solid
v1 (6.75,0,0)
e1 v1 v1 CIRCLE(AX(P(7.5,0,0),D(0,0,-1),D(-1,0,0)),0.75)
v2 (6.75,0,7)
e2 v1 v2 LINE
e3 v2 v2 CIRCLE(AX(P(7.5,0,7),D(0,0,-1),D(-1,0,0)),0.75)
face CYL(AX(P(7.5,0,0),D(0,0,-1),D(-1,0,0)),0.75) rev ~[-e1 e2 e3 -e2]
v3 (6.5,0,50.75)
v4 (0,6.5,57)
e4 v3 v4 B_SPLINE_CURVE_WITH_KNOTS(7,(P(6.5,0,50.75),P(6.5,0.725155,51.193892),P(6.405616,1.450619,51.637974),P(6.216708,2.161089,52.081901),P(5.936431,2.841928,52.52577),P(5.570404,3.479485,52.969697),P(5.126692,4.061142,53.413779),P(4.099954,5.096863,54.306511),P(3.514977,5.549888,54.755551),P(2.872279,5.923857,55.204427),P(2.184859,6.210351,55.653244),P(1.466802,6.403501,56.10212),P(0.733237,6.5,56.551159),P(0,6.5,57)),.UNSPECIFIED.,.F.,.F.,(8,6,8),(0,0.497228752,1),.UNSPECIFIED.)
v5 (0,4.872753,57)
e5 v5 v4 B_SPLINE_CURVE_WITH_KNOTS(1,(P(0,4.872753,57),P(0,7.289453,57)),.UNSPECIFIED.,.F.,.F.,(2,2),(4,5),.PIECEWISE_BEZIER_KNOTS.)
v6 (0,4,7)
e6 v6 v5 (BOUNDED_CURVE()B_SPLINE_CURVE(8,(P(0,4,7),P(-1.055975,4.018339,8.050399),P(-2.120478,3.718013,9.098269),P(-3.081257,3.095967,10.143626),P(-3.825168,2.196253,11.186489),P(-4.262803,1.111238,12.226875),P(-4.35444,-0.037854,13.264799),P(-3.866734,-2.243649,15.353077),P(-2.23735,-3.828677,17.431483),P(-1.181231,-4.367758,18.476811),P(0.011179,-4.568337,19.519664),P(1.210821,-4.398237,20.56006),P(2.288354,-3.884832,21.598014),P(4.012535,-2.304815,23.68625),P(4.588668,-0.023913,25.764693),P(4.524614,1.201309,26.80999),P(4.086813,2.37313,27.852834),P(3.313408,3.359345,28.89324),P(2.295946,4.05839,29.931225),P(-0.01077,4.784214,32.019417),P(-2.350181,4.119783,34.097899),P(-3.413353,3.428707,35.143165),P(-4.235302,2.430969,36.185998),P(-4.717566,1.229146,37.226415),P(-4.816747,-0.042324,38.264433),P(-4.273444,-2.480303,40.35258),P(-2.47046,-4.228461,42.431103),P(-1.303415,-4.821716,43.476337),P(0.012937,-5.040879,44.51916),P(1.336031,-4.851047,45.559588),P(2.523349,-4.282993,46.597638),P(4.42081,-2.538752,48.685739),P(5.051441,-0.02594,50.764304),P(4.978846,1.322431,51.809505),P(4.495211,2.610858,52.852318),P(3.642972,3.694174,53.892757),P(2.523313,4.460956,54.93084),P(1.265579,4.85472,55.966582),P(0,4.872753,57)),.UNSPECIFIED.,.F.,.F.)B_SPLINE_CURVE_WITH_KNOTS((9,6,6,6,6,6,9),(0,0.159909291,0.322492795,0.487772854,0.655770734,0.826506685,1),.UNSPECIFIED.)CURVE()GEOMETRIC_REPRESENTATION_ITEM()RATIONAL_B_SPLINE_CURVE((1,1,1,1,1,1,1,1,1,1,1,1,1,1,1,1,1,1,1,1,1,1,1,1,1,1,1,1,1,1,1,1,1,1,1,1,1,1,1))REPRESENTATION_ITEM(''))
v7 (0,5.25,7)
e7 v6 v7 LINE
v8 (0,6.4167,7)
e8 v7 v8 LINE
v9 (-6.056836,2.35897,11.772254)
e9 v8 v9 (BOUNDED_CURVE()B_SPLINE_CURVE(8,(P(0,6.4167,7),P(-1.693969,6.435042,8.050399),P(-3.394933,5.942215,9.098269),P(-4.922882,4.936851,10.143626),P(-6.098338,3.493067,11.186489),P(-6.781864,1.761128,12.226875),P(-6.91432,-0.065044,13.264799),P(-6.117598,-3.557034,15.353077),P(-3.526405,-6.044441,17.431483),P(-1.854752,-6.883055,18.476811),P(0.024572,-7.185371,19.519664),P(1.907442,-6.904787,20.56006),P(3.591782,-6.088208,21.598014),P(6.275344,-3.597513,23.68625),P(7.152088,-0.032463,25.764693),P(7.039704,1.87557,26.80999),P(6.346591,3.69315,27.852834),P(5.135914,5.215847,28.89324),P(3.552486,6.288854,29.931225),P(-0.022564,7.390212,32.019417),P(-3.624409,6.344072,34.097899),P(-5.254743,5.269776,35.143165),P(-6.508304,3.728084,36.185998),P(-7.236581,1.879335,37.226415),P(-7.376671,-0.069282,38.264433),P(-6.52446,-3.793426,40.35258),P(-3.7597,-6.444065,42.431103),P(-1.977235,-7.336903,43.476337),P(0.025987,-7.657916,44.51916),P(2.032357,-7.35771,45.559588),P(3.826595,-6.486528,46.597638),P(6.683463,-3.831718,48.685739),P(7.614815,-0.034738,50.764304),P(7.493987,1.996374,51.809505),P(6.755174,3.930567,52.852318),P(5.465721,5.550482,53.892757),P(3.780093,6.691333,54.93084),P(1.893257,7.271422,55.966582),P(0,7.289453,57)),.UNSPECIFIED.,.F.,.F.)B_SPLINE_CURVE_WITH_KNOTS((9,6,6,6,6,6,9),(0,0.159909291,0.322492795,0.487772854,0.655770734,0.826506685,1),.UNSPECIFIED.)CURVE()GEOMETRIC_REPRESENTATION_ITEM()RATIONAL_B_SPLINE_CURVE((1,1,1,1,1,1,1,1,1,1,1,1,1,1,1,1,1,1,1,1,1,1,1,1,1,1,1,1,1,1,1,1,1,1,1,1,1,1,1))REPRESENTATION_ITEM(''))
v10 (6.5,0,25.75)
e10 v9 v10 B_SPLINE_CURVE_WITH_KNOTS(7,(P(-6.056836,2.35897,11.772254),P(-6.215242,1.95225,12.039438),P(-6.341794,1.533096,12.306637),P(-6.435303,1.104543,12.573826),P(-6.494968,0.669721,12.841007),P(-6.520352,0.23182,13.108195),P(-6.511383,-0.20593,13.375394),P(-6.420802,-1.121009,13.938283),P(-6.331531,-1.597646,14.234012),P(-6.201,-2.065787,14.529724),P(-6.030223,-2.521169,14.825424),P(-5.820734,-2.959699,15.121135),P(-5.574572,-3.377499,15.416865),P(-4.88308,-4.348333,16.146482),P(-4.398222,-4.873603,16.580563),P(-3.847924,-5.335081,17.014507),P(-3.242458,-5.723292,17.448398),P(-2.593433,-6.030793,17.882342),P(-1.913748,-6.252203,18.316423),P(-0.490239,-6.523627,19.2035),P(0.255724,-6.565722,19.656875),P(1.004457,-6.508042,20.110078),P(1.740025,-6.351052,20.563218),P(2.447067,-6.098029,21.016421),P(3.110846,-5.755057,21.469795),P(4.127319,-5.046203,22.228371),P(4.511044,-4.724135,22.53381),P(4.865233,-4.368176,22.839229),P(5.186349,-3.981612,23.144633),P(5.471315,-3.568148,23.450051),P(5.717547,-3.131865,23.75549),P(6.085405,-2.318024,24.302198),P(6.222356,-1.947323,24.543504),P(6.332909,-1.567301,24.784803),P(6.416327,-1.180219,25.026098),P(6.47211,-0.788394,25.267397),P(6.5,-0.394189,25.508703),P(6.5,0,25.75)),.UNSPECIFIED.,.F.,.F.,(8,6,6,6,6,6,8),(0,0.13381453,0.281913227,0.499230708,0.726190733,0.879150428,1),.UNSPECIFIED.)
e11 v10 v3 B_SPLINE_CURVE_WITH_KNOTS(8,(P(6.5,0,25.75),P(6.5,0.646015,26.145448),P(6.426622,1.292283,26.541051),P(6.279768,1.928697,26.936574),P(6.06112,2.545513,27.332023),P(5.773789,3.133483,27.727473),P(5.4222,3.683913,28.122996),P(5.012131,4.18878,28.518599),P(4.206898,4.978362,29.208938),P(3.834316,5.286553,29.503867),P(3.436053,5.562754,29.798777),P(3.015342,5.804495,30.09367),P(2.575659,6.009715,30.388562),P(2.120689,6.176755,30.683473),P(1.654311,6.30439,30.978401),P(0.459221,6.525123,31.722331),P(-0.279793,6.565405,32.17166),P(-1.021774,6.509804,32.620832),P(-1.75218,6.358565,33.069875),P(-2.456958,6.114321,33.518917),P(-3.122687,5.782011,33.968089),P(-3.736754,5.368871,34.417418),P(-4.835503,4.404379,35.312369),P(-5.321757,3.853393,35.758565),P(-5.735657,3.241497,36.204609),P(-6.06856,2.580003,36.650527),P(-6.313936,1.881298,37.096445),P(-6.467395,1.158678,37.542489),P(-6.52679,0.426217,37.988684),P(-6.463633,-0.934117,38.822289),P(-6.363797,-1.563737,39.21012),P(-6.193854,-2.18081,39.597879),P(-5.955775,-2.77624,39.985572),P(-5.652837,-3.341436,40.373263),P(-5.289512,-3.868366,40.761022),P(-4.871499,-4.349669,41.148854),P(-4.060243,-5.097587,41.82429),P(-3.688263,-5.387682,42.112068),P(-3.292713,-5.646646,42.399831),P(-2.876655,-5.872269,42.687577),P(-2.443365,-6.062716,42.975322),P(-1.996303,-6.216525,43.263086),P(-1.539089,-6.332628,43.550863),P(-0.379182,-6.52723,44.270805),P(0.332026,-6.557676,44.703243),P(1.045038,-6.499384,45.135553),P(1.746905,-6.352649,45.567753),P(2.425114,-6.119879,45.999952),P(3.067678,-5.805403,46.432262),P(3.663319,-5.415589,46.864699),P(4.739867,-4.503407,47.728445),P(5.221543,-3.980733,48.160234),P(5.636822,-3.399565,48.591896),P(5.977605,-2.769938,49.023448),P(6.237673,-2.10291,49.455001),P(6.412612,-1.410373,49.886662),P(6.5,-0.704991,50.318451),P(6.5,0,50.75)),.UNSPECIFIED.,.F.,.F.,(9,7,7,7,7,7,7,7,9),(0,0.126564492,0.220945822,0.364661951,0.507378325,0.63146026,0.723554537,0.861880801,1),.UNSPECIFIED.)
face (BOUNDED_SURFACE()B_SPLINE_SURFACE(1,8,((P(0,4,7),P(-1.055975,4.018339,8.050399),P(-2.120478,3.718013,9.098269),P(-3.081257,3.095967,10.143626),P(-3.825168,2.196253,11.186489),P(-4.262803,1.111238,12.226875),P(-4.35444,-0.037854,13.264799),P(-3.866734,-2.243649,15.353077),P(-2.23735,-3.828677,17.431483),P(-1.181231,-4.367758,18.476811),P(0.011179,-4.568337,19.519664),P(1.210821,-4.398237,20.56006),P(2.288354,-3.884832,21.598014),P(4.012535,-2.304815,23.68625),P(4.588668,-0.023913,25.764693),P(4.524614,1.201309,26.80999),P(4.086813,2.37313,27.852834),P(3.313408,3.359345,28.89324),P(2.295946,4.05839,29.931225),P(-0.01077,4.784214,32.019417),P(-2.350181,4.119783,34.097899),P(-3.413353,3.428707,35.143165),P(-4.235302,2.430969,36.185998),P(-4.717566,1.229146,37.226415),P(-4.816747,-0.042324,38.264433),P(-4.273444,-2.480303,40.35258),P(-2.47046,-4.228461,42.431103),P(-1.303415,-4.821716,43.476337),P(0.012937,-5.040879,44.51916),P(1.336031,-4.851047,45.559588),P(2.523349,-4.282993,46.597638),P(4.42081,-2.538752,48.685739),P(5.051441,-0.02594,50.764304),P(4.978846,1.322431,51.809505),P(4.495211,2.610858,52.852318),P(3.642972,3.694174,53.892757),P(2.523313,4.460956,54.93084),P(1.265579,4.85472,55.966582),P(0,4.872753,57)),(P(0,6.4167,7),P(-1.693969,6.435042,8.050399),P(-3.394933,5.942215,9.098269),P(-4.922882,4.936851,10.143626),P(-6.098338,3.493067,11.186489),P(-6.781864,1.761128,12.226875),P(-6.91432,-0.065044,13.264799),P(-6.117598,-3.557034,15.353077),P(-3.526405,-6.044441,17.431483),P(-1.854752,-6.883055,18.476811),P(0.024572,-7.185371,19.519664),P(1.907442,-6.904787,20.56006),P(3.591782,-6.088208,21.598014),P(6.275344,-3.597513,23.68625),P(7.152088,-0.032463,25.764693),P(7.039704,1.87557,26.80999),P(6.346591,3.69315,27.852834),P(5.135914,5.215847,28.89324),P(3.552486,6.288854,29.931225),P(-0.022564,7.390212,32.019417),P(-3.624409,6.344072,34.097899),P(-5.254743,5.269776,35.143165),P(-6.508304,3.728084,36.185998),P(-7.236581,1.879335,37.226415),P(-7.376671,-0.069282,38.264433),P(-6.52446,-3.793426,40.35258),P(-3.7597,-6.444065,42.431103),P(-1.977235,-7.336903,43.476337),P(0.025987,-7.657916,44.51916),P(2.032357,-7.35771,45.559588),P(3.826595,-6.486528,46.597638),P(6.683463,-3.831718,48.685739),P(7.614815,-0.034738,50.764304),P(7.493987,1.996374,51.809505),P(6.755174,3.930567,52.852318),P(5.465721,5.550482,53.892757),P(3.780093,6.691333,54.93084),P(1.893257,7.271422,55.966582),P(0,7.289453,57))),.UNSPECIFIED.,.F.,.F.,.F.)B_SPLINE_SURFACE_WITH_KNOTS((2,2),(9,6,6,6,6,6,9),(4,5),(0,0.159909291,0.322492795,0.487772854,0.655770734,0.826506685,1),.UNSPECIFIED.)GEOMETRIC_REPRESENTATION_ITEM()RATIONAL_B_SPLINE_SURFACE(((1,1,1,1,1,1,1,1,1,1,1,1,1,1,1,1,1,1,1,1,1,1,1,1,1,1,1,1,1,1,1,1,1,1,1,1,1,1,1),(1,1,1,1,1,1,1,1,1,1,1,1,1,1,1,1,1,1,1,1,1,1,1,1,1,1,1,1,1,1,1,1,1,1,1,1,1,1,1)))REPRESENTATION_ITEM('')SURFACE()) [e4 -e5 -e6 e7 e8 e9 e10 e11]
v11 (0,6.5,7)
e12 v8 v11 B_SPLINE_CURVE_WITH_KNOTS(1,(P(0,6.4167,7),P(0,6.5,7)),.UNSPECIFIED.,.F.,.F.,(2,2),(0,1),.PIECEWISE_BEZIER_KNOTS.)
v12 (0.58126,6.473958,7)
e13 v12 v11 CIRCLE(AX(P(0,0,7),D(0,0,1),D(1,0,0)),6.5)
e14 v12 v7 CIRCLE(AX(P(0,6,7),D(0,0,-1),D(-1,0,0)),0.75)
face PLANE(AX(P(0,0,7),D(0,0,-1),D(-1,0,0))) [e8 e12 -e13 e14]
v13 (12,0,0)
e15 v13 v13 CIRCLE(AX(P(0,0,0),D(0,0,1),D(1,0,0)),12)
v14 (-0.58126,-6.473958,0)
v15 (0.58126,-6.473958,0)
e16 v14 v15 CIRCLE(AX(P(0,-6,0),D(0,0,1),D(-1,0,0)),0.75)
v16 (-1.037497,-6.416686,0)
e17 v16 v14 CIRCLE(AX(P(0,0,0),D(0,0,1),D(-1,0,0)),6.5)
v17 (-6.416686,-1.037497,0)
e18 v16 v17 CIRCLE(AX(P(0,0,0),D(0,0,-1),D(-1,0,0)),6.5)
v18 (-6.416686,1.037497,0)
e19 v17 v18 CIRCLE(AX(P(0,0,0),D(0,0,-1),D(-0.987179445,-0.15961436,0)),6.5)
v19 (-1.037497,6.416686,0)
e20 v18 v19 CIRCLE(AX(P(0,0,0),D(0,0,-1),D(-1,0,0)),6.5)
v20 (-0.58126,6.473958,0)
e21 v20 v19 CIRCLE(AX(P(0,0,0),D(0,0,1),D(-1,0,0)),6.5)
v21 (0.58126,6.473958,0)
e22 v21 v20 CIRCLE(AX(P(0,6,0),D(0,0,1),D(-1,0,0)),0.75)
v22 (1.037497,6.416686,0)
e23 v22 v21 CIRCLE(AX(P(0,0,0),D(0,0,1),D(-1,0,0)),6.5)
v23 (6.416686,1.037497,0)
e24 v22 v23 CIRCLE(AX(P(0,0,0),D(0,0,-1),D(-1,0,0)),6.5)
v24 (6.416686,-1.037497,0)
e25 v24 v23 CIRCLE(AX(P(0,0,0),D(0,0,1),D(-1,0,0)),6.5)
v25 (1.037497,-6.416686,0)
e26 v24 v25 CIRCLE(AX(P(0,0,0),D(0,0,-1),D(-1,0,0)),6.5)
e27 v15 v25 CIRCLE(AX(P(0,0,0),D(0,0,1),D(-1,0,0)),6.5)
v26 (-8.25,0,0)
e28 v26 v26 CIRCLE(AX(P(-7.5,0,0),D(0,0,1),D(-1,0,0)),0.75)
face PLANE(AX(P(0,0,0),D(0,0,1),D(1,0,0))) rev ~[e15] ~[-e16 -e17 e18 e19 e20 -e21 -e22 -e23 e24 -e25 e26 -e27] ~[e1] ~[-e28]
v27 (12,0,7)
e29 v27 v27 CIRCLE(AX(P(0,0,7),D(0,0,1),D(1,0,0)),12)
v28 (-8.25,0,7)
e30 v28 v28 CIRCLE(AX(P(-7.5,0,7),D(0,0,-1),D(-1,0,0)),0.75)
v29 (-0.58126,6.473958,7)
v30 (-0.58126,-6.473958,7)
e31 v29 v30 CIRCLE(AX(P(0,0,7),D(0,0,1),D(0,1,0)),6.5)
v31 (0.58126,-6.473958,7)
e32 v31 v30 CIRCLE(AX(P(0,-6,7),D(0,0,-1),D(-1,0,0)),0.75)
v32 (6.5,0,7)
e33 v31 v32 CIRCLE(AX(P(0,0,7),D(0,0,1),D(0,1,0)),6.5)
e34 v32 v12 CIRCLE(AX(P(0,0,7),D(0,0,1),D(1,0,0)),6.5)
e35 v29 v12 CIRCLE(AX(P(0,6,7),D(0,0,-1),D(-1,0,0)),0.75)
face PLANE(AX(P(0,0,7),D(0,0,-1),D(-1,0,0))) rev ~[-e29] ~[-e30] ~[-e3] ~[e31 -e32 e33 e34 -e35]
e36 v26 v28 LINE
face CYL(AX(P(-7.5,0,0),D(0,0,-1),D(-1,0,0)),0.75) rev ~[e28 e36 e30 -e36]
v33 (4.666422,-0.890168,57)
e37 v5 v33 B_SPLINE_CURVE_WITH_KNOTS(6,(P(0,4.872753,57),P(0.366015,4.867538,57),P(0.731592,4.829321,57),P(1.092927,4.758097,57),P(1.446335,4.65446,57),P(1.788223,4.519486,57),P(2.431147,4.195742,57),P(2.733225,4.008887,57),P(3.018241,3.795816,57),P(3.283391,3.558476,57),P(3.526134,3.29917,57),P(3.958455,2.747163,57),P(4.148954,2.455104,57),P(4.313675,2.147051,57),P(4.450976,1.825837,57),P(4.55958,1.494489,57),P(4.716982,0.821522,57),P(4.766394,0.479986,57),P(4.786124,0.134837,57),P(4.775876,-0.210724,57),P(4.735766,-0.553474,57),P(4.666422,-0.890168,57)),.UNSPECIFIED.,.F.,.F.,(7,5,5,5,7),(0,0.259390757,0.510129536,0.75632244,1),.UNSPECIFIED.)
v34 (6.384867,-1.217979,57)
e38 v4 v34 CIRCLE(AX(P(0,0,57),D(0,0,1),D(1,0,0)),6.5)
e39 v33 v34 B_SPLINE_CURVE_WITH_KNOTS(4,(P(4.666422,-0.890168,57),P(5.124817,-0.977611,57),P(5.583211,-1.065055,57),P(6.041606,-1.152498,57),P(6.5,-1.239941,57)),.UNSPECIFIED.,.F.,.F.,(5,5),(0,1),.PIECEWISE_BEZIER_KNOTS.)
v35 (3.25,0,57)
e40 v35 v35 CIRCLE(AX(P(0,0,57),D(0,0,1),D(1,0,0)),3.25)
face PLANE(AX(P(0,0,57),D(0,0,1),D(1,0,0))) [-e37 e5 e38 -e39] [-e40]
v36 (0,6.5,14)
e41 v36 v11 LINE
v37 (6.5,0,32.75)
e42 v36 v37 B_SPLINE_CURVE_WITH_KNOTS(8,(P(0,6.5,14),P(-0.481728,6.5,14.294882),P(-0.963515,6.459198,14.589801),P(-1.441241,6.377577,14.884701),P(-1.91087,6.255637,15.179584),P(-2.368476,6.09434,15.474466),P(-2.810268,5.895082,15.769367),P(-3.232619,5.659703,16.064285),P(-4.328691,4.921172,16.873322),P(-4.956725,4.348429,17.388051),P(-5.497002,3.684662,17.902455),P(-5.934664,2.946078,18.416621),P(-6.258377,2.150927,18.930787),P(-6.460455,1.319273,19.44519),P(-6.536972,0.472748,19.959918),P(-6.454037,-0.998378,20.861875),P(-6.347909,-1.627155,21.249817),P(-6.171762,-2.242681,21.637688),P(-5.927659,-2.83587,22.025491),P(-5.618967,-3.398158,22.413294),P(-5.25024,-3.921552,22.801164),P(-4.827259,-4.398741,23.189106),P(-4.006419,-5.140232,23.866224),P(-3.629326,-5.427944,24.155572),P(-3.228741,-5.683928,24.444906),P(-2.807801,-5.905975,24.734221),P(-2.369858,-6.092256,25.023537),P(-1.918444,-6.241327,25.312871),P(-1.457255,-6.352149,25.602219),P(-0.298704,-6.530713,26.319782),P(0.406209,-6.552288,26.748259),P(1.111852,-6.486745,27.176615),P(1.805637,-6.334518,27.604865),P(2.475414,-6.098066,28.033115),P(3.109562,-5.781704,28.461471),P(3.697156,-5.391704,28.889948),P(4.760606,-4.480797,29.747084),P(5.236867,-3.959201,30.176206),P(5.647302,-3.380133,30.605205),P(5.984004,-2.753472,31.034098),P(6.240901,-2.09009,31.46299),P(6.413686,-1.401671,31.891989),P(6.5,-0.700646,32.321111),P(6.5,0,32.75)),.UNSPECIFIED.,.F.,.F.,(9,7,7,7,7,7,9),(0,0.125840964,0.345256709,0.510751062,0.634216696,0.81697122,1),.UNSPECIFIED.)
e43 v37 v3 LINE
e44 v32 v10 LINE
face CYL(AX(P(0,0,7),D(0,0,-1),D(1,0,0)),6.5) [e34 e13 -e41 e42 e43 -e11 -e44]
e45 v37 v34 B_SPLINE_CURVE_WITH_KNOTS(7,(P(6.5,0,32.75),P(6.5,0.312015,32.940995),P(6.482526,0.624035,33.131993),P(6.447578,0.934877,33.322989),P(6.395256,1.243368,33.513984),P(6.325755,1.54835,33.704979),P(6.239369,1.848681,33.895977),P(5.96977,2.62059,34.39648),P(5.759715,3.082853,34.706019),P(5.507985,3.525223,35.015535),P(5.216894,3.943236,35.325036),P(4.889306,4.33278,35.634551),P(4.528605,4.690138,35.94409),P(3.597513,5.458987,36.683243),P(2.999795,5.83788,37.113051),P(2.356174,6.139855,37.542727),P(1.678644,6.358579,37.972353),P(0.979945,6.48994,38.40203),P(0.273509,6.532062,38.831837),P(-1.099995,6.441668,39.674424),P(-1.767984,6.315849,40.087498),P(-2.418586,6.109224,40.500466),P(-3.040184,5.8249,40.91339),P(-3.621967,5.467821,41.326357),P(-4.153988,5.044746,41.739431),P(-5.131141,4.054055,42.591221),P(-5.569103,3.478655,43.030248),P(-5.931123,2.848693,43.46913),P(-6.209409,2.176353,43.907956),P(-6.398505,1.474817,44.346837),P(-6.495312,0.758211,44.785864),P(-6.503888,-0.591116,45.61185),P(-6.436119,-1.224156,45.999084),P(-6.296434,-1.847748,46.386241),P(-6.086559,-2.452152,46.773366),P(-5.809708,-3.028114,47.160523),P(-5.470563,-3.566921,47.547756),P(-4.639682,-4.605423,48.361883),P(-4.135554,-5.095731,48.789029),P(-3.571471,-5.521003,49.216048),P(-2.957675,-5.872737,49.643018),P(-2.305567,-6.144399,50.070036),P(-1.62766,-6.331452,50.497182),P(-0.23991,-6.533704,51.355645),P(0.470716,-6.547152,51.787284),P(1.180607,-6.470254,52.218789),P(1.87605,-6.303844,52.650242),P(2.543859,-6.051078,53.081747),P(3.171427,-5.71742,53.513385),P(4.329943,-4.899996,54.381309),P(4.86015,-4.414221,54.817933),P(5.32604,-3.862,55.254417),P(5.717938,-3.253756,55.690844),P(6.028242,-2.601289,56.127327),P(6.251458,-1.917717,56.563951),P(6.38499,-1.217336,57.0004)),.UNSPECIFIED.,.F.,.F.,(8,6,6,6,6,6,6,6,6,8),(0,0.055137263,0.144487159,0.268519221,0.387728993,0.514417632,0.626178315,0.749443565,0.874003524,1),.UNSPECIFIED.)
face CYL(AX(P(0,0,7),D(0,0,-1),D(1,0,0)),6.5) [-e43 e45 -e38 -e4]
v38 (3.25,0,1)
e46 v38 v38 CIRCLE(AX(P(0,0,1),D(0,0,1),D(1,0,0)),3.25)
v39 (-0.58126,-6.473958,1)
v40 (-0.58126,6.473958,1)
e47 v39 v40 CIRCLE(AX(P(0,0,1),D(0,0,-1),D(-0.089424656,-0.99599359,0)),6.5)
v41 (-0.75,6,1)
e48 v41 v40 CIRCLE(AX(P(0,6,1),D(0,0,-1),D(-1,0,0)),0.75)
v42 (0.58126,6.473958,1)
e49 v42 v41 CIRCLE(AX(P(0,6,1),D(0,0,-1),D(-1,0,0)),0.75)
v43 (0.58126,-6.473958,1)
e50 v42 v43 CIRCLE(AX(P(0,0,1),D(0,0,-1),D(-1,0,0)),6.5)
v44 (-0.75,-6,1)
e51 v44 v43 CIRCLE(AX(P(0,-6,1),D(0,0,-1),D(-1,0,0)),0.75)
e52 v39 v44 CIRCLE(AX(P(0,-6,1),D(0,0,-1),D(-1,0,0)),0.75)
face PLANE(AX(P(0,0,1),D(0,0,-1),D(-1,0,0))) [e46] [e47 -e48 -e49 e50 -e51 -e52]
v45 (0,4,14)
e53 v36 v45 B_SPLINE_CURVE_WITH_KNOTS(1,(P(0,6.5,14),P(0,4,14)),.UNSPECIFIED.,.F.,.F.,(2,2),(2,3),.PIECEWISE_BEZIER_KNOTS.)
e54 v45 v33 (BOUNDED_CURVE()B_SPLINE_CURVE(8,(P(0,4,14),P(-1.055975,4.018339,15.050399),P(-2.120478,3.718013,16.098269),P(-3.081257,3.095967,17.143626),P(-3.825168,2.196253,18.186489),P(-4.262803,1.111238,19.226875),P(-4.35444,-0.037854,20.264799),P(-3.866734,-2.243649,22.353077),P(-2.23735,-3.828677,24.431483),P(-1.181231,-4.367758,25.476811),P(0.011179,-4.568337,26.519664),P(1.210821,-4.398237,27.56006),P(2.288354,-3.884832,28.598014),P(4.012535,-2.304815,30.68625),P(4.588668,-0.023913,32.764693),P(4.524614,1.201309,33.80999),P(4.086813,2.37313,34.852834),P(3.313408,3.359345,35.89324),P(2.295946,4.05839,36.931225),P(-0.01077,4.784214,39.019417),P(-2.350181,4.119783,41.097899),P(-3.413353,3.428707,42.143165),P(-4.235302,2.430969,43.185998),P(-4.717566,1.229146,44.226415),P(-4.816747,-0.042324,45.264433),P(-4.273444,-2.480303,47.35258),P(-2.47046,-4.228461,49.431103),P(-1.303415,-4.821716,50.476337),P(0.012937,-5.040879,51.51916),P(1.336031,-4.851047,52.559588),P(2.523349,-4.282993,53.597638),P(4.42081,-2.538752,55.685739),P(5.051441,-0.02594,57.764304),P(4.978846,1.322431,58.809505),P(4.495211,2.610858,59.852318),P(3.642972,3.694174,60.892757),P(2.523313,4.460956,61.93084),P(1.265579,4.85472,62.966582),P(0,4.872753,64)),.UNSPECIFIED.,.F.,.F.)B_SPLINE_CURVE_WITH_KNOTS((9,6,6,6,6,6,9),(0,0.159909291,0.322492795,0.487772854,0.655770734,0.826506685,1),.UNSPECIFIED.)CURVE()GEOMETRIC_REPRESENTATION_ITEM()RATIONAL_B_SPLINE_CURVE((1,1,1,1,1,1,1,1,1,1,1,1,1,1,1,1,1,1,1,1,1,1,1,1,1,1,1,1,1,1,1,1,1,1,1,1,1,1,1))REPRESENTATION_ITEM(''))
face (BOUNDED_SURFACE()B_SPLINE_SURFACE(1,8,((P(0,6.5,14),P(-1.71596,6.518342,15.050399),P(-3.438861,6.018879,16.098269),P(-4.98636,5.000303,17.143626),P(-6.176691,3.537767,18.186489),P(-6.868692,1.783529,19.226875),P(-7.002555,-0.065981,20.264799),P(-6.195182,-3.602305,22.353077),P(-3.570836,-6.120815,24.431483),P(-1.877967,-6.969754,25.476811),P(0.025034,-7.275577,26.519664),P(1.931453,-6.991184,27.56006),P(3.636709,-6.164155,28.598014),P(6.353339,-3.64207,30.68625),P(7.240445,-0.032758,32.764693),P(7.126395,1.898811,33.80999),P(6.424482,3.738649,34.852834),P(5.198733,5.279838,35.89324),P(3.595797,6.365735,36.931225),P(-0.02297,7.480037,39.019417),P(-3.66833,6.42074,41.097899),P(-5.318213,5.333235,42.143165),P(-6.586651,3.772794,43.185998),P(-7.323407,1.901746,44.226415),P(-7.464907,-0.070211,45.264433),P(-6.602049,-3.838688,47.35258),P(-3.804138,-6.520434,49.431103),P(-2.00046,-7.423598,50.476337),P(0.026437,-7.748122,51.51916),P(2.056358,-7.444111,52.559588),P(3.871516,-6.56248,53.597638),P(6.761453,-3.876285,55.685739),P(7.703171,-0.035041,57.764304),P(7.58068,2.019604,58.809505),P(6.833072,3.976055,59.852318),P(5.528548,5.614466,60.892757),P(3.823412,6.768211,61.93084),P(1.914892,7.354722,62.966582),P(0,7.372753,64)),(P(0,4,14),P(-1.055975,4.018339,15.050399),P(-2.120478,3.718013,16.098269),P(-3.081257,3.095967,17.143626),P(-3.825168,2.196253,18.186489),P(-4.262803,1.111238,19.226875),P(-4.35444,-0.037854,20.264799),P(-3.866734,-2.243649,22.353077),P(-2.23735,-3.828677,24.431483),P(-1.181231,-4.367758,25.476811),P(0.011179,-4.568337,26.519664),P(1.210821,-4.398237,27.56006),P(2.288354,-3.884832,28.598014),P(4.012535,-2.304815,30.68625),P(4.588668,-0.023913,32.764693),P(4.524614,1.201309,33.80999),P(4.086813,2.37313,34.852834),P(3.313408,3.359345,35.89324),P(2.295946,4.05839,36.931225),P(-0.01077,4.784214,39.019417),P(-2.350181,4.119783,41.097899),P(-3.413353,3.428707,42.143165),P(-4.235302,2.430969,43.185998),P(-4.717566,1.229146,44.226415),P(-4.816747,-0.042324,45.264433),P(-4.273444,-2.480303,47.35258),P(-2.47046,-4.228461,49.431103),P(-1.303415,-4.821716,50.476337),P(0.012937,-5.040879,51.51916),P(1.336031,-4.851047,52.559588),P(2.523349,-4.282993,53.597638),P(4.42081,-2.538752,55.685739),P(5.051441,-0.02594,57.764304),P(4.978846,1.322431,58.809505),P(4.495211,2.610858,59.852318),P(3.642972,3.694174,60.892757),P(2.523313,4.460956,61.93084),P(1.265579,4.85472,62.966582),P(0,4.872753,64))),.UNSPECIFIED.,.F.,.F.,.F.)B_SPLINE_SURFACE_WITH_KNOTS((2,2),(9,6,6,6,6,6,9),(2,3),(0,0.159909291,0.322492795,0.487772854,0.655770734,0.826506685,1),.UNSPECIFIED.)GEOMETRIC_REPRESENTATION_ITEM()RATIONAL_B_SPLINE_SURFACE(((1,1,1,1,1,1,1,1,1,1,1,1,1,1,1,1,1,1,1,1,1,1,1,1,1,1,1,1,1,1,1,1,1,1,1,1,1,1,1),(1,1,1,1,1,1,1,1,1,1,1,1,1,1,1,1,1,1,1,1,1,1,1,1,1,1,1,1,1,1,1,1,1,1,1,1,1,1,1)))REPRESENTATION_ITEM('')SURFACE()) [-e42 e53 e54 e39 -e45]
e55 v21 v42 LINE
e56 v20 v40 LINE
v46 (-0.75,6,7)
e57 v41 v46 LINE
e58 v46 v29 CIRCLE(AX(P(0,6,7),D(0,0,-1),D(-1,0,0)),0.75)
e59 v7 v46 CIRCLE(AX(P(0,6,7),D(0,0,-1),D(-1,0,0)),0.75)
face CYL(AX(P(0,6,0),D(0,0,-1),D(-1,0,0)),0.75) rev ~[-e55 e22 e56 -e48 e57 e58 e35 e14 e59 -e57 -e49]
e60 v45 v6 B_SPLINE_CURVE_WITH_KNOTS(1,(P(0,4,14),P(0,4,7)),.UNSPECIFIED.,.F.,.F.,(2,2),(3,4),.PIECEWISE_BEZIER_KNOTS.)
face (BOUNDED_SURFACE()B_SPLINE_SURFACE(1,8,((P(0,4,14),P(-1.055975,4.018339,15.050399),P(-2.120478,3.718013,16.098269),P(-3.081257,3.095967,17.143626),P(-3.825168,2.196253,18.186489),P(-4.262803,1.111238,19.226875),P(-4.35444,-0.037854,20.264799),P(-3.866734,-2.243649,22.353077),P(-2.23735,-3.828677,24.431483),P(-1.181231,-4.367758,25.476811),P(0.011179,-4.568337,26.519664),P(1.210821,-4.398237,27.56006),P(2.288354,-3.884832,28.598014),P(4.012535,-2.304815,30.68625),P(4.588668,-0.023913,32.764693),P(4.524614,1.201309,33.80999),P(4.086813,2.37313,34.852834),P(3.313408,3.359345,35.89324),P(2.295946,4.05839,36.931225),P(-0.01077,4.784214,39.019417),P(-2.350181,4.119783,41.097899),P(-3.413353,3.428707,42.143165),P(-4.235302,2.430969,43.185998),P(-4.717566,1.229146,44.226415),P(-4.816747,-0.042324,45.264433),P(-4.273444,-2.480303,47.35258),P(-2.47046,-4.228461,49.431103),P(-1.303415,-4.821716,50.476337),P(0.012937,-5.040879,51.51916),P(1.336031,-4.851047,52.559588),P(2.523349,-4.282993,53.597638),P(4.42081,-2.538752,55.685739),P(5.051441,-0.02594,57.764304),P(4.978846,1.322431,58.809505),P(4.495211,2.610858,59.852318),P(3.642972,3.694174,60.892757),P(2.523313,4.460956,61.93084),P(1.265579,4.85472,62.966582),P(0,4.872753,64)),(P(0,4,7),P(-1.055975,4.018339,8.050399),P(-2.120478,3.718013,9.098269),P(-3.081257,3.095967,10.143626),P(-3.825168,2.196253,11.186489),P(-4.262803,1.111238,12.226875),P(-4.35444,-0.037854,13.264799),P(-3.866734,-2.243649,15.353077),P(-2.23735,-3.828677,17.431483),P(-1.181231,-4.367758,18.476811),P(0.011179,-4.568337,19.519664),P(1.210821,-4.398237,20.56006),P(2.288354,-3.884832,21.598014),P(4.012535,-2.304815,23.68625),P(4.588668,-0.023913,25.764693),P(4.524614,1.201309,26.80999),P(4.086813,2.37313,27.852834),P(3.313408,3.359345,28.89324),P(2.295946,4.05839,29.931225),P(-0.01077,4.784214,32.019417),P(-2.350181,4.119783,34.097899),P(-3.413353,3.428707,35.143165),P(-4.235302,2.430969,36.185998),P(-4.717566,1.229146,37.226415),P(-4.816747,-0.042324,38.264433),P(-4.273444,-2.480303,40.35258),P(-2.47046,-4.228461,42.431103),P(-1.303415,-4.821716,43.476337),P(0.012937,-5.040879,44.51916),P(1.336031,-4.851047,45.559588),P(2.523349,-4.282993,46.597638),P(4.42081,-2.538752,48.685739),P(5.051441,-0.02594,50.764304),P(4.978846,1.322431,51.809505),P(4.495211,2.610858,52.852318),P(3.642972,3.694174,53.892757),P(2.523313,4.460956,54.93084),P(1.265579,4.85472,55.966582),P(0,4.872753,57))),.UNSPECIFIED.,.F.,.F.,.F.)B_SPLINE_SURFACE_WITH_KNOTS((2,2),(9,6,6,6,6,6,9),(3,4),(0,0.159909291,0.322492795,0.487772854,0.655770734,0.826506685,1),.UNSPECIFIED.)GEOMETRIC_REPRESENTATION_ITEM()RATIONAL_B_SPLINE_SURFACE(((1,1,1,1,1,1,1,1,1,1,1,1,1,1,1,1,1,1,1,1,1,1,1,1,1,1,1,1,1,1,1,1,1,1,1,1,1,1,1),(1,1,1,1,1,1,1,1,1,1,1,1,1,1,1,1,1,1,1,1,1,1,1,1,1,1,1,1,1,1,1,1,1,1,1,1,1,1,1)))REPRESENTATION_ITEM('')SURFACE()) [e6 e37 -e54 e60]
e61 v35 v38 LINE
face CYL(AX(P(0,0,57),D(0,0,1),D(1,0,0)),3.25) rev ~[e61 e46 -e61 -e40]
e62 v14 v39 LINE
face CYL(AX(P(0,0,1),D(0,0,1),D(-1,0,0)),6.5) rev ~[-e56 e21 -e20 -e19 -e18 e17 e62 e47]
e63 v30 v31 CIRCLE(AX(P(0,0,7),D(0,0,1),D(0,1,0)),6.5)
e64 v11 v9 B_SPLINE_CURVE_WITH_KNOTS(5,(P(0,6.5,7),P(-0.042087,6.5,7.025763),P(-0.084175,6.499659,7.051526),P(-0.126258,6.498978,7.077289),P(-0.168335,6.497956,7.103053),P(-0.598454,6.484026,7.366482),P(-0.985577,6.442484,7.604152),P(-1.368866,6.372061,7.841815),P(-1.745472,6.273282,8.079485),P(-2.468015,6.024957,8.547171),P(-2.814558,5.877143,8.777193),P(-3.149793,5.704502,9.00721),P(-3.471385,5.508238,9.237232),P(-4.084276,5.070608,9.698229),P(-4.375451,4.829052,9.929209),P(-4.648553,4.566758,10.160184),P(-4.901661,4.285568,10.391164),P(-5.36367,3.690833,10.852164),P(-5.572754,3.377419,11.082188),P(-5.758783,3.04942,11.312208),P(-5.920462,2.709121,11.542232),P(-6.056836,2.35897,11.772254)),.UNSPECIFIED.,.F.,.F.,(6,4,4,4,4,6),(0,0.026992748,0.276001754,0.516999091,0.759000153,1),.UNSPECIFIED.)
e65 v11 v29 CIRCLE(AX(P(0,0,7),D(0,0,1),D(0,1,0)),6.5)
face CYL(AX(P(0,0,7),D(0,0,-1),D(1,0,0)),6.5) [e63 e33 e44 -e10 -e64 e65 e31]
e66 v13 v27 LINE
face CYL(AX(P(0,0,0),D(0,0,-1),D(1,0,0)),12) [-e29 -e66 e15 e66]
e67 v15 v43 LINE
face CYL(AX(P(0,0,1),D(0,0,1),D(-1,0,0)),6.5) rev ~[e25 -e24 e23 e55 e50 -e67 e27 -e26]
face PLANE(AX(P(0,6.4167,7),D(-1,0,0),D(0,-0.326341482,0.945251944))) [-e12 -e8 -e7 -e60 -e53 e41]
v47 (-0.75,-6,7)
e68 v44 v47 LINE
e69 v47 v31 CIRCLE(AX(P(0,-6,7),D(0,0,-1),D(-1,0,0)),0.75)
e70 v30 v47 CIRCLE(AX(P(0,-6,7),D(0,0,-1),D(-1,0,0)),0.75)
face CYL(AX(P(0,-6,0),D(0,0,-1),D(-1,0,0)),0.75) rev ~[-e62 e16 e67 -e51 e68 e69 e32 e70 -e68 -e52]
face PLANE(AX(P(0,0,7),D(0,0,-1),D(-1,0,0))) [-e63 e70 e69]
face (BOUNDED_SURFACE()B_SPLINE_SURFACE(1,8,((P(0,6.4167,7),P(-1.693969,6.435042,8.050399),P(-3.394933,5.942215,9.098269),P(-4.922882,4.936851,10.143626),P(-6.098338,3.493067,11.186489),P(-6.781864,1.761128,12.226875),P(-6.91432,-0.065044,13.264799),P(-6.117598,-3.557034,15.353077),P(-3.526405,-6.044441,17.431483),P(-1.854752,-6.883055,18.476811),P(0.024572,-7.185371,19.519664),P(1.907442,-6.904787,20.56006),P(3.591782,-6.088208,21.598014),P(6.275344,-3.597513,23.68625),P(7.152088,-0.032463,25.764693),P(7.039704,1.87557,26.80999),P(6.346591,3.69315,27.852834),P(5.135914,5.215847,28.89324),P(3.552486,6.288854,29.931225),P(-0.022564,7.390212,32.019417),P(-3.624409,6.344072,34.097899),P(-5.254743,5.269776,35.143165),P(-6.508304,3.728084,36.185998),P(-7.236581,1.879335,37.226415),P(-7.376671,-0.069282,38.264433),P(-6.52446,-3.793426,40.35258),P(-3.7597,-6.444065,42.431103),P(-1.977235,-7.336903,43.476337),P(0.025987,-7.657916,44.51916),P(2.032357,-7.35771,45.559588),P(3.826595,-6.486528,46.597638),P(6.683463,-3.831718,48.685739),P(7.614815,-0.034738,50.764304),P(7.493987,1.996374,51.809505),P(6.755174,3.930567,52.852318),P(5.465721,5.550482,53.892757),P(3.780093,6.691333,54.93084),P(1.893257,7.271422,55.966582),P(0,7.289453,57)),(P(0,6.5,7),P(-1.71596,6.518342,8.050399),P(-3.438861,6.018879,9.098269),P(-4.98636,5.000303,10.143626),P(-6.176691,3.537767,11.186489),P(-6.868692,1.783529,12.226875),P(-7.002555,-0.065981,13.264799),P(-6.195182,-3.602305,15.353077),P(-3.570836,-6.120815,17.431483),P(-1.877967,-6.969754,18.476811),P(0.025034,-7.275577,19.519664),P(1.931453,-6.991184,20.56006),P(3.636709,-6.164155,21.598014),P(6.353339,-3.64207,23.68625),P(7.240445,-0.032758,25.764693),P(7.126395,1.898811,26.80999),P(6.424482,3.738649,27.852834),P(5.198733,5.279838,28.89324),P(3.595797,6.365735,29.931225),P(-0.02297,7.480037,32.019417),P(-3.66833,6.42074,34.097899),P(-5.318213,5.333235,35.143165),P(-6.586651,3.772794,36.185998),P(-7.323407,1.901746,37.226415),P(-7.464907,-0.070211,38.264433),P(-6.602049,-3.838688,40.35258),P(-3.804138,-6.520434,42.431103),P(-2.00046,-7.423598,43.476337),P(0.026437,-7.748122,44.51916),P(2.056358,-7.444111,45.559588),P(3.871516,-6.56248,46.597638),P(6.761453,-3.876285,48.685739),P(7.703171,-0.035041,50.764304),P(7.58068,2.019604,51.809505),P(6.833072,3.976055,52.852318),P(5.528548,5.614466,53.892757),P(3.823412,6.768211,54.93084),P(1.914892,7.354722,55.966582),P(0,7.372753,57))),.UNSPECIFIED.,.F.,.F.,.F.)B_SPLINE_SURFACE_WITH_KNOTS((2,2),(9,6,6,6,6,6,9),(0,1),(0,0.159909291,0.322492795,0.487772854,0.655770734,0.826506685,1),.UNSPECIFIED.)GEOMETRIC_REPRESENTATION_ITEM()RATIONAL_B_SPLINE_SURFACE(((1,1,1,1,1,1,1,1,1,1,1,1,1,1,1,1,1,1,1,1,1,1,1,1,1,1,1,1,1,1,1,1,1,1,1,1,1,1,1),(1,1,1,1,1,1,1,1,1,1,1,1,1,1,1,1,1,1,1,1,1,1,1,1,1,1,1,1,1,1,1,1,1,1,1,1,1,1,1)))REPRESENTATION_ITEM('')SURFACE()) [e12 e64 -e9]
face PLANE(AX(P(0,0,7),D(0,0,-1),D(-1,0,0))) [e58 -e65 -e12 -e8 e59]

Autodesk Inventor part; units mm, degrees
ref_plane "YZ Plane" through (0, 0, 0) normal (1, 0, 0) x (0, 1, 0)
ref_plane "XY Plane" through (0, 0, 0) normal (0, 0, 1) x (1, 0, 0)
sketch "Sketch1" plane through (0, 0, 0) normal (0, 0, 1) x (1, 0, 0)
  line L0 (0, 0) -> (0, 7.5)
  circle A0 centre (0, 7.5) radius 1.5
  circle A1 centre (-5.3033, 5.3033) radius 1.5
  circle A2 centre (-7.5, 0) radius 1.5
  circle A3 centre (-5.3033, -5.3033) radius 1.5
  circle A4 centre (0, -7.5) radius 1.5
  circle A5 centre (5.3033, -5.3033) radius 1.5
  circle A6 centre (7.5, 0) radius 1.5
  circle A7 centre (5.3033, 5.3033) radius 1.5
  circle A8 centre (0, 0) radius 12
  dimension "d0" = 7.5
  dimension "d1" = 3
  dimension "d4" = 360
  dimension "d6" = 24
extrude "Extrusion1" add sketch "Sketch1" along normal blind 7 contours A1 | A3 | A5 | A7 | A8
sketch "Sketch2" plane through (0, 0, 0) normal (0, 0, -1) x (-1, 0, 0)
  circle A0 centre (0, 0) radius 6.5
  dimension "d9" = 13
extrude "Extrusion2" cut sketch "Sketch2" against normal blind 1
sketch "Sketch3" plane through (0, 0, 7) normal (0, 0, 1) x (1, 0, 0)
  circle A0 centre (0, 0) radius 6.5
  dimension "d12" = 13
extrude "Extrusion3" add sketch "Sketch3" along normal blind 50
sketch "Sketch5" plane through (0, 0, 57) normal (0, 0, 1) x (1, 0, 0)
  circle A0 centre (0, 0) radius 3.25
  dimension "d25" = 6.5
extrude "Extrusion5" cut sketch "Sketch5" against normal up to surface (56 mm away)
ref_plane "Work Plane1" through (0, 12, 0) normal (0, 1, 0) x (-1, 0, 0)
sketch "Sketch8" plane through (0, 0, 7) normal (0, 0, 1) x (1, 0, 0)
  circle A0 centre (0, 0) radius 3
  dimension "d44" = 6
extrude "Extrusion8" cut sketch "Sketch8" against normal through all
sketch "Sketch9" plane through (0, 0, 0) normal (1, 0, 0) x (0, 1, 0)
  line L0 (6.5, 7) -> (6.5, 57) projected
  line L1 (6.5, 7) -> (6.5, 57) projected
  line L2 (6.4167, 7) -> (9, 7) projected
  line L3 (9, 7) -> (4, 7)
  line L4 (4, 7) -> (4, 14)
  line L5 (4, 14) -> (9, 14)
  line L6 (9, 14) -> (9, 7)
  line L7 (0, -11.4) -> (0, 68.4) projected
  point P0 (0, 0)
  dimension "d61" = 5
  dimension "d62" = 7
coil "Coil2" sketch "Sketch9" operation cut axis through (0, 0, 7) along (0, 0, 1) pitch 25 turns 2 hand right taper 1
sketch "Boceto13" plane through (0, 0, 0) normal (0, 0, -1) x (-1, 0, 0)
  arc A0 (-6.4167, 1.0375) -> (-6.4167, -1.0375) centre (-7.5, 0) ccw projected
  circle A1 centre (-7.5, 0) radius 1.5
  arc A2 (-1.0375, -6.4167) -> (1.0375, -6.4167) centre (0, -7.5) ccw projected
  circle A3 centre (0, -7.5) radius 1.5
  arc A4 (1.0375, 6.4167) -> (-1.0375, 6.4167) centre (0, 7.5) ccw projected
  circle A5 centre (0, 7.5) radius 1.5
  arc A6 (6.4167, -1.0375) -> (6.4167, 1.0375) centre (7.5, 0) ccw projected
  circle A7 centre (7.5, 0) radius 1.5
  point P0 (0, 0)
extrude "Extrusión9" add sketch "Boceto13" against normal blind 7
sketch "Boceto14" plane through (0, 0, 1) normal (0, 0, -1) x (-1, 0, 0)
  circle A0 centre (0, 0) radius 6.5
extrude "Extrusión10" cut sketch "Boceto14" along normal blind 2
sketch "Boceto15" plane through (0, 0, 0) normal (0, 0, -1) x (-1, 0, 0)
  line L0 (0, 0) -> (-7.5, 0)
  line L1 (0, 0) -> (7.5, 0)
  line L2 (0, 0) -> (0, 6)
  line L3 (0, 0) -> (0, -6)
  circle A0 centre (0, 6) radius 0.75
  circle A1 centre (-7.5, 0) radius 0.75
  circle A2 centre (0, -6) radius 0.75
  circle A3 centre (7.5, 0) radius 0.75
  dimension "d76" = 7.5
  dimension "d77" = 7.5
  dimension "d78" = 6
  dimension "d79" = 6
  dimension "d80" = 1.5
  dimension "d81" = 1.5
  dimension "d82" = 1.5
  dimension "d83" = 1.5
extrude "Extrusión11" cut sketch "Boceto15" against normal blind 7
properties part number "ScrewActuatorGripper"
